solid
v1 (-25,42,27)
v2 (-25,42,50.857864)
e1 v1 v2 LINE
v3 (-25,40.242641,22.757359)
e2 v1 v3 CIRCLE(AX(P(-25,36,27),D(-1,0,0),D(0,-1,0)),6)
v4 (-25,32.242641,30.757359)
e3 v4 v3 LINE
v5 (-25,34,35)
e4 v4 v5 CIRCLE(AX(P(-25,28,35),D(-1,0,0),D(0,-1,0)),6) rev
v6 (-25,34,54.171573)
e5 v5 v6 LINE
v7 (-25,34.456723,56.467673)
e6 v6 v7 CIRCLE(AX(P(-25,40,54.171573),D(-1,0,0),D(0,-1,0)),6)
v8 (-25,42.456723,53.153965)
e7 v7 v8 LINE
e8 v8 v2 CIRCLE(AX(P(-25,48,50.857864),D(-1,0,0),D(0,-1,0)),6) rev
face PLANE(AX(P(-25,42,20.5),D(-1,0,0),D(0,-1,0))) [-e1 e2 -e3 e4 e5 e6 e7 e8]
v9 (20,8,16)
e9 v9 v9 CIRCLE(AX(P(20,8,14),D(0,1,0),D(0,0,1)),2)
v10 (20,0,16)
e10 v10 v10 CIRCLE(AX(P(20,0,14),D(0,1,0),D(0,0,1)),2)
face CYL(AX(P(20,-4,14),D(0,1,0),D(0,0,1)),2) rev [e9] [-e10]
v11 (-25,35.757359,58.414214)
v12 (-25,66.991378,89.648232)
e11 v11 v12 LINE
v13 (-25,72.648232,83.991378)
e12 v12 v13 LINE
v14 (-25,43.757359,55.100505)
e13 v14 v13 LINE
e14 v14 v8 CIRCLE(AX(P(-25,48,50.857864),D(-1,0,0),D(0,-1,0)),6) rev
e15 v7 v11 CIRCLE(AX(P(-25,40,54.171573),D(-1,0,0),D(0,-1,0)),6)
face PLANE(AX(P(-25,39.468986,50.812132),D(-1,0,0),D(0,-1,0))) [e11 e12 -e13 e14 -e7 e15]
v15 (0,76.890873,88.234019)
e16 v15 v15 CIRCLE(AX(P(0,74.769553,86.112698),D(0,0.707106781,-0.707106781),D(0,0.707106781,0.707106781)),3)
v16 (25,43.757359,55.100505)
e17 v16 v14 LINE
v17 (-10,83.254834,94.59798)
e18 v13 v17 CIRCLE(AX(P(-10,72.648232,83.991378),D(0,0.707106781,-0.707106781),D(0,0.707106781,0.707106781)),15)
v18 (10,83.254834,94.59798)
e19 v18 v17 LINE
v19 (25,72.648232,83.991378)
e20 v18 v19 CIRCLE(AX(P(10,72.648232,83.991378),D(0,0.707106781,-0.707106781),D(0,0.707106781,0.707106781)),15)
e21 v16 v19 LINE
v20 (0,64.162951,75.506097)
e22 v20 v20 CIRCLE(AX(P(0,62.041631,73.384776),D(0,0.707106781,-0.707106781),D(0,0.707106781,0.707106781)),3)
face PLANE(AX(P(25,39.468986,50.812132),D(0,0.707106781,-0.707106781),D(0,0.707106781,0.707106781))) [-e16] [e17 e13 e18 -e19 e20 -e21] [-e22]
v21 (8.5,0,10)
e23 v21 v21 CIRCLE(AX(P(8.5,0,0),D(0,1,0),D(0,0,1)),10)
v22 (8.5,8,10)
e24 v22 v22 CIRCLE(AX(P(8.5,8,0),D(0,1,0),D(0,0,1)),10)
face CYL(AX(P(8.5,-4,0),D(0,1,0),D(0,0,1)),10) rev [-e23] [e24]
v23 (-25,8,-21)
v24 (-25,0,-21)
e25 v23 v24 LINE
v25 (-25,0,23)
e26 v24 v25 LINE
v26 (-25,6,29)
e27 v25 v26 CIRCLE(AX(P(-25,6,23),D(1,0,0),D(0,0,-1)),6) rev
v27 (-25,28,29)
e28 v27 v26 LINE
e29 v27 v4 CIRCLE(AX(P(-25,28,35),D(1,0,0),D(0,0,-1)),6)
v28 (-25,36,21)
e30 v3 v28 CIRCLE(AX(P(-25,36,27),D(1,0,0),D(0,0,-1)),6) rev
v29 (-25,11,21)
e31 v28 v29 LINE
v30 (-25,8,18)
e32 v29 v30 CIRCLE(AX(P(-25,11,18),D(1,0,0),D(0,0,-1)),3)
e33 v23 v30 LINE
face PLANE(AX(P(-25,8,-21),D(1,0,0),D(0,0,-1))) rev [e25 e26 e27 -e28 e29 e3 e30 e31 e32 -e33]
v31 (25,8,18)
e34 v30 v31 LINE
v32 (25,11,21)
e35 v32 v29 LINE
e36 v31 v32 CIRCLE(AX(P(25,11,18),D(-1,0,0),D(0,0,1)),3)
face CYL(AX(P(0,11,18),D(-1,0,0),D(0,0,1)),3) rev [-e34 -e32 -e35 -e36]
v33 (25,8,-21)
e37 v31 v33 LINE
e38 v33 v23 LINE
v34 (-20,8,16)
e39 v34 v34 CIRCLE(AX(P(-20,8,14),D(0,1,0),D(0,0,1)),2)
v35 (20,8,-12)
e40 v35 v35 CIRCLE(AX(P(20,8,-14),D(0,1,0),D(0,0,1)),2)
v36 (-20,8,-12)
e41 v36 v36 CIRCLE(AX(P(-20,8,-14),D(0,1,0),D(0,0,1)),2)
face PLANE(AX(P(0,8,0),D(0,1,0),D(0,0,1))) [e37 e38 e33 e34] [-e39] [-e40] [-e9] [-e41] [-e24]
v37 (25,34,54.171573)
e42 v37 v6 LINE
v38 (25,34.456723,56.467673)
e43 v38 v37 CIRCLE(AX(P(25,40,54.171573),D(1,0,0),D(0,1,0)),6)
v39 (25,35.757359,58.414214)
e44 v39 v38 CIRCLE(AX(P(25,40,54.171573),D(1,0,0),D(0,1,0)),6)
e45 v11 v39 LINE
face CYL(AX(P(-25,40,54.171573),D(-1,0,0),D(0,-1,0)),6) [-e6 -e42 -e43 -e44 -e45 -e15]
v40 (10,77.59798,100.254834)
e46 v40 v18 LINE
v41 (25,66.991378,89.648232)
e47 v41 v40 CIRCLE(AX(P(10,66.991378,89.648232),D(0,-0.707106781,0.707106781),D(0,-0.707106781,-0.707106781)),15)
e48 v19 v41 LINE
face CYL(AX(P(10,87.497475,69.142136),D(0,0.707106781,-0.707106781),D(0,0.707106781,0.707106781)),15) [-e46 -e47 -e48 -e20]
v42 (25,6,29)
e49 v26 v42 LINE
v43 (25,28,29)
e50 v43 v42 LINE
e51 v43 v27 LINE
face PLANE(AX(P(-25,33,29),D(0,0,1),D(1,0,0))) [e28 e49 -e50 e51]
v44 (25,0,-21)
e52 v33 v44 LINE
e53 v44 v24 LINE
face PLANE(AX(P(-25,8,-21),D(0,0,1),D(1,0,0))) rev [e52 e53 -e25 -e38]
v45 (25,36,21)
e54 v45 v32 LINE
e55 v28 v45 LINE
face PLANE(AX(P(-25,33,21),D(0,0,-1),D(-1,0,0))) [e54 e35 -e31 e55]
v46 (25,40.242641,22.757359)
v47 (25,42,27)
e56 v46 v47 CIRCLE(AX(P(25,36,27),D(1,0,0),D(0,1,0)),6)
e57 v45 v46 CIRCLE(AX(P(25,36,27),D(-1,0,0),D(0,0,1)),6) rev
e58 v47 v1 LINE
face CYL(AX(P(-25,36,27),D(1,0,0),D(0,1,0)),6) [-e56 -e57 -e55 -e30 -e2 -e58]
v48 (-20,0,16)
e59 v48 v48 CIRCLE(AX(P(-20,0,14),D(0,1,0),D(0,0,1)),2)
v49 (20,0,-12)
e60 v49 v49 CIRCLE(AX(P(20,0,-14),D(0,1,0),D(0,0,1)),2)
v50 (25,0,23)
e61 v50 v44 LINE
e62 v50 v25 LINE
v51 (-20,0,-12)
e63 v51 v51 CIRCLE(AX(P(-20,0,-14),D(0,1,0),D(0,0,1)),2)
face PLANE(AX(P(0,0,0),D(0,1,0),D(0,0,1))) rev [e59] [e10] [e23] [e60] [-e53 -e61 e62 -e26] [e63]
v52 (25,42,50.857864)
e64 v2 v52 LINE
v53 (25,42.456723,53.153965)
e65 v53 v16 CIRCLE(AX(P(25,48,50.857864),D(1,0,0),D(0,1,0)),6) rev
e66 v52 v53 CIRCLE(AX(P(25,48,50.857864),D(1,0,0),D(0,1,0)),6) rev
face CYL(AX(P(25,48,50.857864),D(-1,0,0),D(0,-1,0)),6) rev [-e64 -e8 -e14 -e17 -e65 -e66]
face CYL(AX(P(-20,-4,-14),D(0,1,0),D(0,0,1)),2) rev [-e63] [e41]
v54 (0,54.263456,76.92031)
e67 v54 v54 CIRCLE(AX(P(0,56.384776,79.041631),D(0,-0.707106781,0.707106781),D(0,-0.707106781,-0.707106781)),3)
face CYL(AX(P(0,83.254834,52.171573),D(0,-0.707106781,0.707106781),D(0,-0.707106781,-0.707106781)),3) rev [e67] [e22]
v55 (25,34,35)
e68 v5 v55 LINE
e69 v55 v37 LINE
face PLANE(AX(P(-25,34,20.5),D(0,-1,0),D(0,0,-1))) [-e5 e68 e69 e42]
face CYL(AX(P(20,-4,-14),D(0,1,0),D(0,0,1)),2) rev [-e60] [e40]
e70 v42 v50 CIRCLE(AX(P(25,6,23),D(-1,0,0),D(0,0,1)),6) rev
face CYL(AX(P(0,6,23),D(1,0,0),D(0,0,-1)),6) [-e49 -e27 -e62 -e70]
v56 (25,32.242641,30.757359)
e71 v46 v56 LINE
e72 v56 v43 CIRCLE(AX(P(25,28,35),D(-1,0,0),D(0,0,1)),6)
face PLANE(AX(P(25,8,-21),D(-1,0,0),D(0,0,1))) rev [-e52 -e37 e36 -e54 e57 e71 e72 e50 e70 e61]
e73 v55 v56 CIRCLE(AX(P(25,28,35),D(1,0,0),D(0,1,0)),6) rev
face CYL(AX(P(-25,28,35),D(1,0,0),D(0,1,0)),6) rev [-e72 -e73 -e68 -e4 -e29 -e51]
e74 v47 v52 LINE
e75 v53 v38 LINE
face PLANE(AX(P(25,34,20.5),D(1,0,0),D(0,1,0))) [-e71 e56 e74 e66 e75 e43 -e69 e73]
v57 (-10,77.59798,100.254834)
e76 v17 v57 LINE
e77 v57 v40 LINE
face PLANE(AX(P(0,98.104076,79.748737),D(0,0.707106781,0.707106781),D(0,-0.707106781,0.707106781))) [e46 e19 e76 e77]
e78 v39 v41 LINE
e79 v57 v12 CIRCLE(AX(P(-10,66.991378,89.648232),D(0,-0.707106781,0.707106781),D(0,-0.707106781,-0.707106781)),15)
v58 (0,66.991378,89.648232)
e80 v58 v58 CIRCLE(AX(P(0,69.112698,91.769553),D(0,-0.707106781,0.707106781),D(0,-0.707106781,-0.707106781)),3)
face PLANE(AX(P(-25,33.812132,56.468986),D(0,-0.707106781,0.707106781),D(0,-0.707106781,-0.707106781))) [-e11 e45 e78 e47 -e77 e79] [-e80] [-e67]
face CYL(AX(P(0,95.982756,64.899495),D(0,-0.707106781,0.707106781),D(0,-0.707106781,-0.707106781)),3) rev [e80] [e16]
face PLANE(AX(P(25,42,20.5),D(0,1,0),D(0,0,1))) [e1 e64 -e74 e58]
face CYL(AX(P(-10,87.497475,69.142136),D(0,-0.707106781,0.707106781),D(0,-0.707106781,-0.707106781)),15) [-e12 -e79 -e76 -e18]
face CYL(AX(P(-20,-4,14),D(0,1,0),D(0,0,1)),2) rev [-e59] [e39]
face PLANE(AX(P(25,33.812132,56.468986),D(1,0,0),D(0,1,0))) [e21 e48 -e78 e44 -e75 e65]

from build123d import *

# Parameters (mm, degrees)
SKETCH1_W           = 50
SKETCH1_H           = 42
BOSS_EXTRUDE1_DEPTH = 8
SKETCH2_R           = 2
SKETCH2_R_2         = 10
CUT_EXTRUDE2_DEPTH  = 12
SKETCH6_W           = 50
SKETCH6_H           = 8
BOSS_EXTRUDE3_DEPTH = 33
SWEEP2_START        = -25
SWEEP2_DEPTH        = 50
FILLET1_R           = 6
FILLET2_R           = 3
SKETCH8_R           = 3
CUT_EXTRUDE3_DEPTH  = 38
FILLET3_R           = 15


# Read off the part's stored shape, not the designer's step: Sweep2
with BuildPart() as part:
    # Sketch1 → Boss-Extrude1 (new body)
    with BuildSketch(Plane(origin=(0, 0, 0), x_dir=(1, 0, 0), z_dir=(0, 1, 0))):
        Rectangle(SKETCH1_W, SKETCH1_H)
    extrude(amount=BOSS_EXTRUDE1_DEPTH)

    # Sketch2 → Cut-Extrude2 (cut)
    with BuildSketch(Plane(origin=(0, 8, 0), x_dir=(1, 0, 0), z_dir=(0, 1, 0))):
        with Locations(Location((-20, 14, 0), (0, 0, 270))):
            Circle(SKETCH2_R)
        with Locations(Location((20, 14, 0), (0, 0, 270))):
            Circle(SKETCH2_R)
        with Locations(Location((20, -14, 0), (0, 0, 270))):
            Circle(SKETCH2_R)
        with Locations(Location((-20, -14, 0), (0, 0, 270))):
            Circle(SKETCH2_R)
        with Locations(Location((8.5, 0, 0), (0, 0, 270))):
            Circle(SKETCH2_R_2)
    extrude(amount=-CUT_EXTRUDE2_DEPTH, mode=Mode.SUBTRACT)

    # Sketch6 → Boss-Extrude3 (add)
    with BuildSketch(Plane.XZ):
        with Locations((0, 25)):
            Rectangle(SKETCH6_W, SKETCH6_H)
    extrude(amount=-BOSS_EXTRUDE3_DEPTH)

    # Sweep2 outline → Sweep2 (add)
    with BuildSketch(Plane.YZ.offset(SWEEP2_START)):
        Polygon((33, 29), (33, 21), (42, 21), (42, 53.343145751), (83.254833996, 94.597979746), (77.597979746, 100.254833996), (34, 56.656854249), (34, 29), align=None)
    extrude(amount=SWEEP2_DEPTH)

    # Fillet1
    fillet1_edges = [part.edges().sort_by_distance(p)[0] for p in [
        (0, 0, 29),
        (0, 34, 56.656854249),
        (0, 42, 53.343145751),
        (0, 34, 29),
        (0, 42, 21),
    ]]
    fillet(fillet1_edges, radius=FILLET1_R)

    # Fillet2
    fillet2_edges = [part.edges().sort_by_distance(p)[0] for p in [
        (0, 8, 21),
    ]]
    fillet(fillet2_edges, radius=FILLET2_R)

    # Sketch8 → Cut-Extrude3 (cut)
    with BuildSketch(Plane(origin=(0, -11.328427125, 11.328427125), x_dir=(1, 0, 0), z_dir=(0, -0.7071067811865465, 0.7071067811865487))):
        with Locations(Location((0, 95.76093065, 0), (0, 0, 270))):
            Circle(SKETCH8_R)
        with Locations(Location((0, 113.76093065, 0), (0, 0, 270))):
            Circle(SKETCH8_R)
    extrude(amount=-CUT_EXTRUDE3_DEPTH, mode=Mode.SUBTRACT)

    # Fillet3
    fillet3_edges = [part.edges().sort_by_distance(p)[0] for p in [
        (-25, 80.426406871, 97.426406871),
        (25, 80.426406871, 97.426406871),
    ]]
    fillet(fillet3_edges, radius=FILLET3_R)


solid = part.part
